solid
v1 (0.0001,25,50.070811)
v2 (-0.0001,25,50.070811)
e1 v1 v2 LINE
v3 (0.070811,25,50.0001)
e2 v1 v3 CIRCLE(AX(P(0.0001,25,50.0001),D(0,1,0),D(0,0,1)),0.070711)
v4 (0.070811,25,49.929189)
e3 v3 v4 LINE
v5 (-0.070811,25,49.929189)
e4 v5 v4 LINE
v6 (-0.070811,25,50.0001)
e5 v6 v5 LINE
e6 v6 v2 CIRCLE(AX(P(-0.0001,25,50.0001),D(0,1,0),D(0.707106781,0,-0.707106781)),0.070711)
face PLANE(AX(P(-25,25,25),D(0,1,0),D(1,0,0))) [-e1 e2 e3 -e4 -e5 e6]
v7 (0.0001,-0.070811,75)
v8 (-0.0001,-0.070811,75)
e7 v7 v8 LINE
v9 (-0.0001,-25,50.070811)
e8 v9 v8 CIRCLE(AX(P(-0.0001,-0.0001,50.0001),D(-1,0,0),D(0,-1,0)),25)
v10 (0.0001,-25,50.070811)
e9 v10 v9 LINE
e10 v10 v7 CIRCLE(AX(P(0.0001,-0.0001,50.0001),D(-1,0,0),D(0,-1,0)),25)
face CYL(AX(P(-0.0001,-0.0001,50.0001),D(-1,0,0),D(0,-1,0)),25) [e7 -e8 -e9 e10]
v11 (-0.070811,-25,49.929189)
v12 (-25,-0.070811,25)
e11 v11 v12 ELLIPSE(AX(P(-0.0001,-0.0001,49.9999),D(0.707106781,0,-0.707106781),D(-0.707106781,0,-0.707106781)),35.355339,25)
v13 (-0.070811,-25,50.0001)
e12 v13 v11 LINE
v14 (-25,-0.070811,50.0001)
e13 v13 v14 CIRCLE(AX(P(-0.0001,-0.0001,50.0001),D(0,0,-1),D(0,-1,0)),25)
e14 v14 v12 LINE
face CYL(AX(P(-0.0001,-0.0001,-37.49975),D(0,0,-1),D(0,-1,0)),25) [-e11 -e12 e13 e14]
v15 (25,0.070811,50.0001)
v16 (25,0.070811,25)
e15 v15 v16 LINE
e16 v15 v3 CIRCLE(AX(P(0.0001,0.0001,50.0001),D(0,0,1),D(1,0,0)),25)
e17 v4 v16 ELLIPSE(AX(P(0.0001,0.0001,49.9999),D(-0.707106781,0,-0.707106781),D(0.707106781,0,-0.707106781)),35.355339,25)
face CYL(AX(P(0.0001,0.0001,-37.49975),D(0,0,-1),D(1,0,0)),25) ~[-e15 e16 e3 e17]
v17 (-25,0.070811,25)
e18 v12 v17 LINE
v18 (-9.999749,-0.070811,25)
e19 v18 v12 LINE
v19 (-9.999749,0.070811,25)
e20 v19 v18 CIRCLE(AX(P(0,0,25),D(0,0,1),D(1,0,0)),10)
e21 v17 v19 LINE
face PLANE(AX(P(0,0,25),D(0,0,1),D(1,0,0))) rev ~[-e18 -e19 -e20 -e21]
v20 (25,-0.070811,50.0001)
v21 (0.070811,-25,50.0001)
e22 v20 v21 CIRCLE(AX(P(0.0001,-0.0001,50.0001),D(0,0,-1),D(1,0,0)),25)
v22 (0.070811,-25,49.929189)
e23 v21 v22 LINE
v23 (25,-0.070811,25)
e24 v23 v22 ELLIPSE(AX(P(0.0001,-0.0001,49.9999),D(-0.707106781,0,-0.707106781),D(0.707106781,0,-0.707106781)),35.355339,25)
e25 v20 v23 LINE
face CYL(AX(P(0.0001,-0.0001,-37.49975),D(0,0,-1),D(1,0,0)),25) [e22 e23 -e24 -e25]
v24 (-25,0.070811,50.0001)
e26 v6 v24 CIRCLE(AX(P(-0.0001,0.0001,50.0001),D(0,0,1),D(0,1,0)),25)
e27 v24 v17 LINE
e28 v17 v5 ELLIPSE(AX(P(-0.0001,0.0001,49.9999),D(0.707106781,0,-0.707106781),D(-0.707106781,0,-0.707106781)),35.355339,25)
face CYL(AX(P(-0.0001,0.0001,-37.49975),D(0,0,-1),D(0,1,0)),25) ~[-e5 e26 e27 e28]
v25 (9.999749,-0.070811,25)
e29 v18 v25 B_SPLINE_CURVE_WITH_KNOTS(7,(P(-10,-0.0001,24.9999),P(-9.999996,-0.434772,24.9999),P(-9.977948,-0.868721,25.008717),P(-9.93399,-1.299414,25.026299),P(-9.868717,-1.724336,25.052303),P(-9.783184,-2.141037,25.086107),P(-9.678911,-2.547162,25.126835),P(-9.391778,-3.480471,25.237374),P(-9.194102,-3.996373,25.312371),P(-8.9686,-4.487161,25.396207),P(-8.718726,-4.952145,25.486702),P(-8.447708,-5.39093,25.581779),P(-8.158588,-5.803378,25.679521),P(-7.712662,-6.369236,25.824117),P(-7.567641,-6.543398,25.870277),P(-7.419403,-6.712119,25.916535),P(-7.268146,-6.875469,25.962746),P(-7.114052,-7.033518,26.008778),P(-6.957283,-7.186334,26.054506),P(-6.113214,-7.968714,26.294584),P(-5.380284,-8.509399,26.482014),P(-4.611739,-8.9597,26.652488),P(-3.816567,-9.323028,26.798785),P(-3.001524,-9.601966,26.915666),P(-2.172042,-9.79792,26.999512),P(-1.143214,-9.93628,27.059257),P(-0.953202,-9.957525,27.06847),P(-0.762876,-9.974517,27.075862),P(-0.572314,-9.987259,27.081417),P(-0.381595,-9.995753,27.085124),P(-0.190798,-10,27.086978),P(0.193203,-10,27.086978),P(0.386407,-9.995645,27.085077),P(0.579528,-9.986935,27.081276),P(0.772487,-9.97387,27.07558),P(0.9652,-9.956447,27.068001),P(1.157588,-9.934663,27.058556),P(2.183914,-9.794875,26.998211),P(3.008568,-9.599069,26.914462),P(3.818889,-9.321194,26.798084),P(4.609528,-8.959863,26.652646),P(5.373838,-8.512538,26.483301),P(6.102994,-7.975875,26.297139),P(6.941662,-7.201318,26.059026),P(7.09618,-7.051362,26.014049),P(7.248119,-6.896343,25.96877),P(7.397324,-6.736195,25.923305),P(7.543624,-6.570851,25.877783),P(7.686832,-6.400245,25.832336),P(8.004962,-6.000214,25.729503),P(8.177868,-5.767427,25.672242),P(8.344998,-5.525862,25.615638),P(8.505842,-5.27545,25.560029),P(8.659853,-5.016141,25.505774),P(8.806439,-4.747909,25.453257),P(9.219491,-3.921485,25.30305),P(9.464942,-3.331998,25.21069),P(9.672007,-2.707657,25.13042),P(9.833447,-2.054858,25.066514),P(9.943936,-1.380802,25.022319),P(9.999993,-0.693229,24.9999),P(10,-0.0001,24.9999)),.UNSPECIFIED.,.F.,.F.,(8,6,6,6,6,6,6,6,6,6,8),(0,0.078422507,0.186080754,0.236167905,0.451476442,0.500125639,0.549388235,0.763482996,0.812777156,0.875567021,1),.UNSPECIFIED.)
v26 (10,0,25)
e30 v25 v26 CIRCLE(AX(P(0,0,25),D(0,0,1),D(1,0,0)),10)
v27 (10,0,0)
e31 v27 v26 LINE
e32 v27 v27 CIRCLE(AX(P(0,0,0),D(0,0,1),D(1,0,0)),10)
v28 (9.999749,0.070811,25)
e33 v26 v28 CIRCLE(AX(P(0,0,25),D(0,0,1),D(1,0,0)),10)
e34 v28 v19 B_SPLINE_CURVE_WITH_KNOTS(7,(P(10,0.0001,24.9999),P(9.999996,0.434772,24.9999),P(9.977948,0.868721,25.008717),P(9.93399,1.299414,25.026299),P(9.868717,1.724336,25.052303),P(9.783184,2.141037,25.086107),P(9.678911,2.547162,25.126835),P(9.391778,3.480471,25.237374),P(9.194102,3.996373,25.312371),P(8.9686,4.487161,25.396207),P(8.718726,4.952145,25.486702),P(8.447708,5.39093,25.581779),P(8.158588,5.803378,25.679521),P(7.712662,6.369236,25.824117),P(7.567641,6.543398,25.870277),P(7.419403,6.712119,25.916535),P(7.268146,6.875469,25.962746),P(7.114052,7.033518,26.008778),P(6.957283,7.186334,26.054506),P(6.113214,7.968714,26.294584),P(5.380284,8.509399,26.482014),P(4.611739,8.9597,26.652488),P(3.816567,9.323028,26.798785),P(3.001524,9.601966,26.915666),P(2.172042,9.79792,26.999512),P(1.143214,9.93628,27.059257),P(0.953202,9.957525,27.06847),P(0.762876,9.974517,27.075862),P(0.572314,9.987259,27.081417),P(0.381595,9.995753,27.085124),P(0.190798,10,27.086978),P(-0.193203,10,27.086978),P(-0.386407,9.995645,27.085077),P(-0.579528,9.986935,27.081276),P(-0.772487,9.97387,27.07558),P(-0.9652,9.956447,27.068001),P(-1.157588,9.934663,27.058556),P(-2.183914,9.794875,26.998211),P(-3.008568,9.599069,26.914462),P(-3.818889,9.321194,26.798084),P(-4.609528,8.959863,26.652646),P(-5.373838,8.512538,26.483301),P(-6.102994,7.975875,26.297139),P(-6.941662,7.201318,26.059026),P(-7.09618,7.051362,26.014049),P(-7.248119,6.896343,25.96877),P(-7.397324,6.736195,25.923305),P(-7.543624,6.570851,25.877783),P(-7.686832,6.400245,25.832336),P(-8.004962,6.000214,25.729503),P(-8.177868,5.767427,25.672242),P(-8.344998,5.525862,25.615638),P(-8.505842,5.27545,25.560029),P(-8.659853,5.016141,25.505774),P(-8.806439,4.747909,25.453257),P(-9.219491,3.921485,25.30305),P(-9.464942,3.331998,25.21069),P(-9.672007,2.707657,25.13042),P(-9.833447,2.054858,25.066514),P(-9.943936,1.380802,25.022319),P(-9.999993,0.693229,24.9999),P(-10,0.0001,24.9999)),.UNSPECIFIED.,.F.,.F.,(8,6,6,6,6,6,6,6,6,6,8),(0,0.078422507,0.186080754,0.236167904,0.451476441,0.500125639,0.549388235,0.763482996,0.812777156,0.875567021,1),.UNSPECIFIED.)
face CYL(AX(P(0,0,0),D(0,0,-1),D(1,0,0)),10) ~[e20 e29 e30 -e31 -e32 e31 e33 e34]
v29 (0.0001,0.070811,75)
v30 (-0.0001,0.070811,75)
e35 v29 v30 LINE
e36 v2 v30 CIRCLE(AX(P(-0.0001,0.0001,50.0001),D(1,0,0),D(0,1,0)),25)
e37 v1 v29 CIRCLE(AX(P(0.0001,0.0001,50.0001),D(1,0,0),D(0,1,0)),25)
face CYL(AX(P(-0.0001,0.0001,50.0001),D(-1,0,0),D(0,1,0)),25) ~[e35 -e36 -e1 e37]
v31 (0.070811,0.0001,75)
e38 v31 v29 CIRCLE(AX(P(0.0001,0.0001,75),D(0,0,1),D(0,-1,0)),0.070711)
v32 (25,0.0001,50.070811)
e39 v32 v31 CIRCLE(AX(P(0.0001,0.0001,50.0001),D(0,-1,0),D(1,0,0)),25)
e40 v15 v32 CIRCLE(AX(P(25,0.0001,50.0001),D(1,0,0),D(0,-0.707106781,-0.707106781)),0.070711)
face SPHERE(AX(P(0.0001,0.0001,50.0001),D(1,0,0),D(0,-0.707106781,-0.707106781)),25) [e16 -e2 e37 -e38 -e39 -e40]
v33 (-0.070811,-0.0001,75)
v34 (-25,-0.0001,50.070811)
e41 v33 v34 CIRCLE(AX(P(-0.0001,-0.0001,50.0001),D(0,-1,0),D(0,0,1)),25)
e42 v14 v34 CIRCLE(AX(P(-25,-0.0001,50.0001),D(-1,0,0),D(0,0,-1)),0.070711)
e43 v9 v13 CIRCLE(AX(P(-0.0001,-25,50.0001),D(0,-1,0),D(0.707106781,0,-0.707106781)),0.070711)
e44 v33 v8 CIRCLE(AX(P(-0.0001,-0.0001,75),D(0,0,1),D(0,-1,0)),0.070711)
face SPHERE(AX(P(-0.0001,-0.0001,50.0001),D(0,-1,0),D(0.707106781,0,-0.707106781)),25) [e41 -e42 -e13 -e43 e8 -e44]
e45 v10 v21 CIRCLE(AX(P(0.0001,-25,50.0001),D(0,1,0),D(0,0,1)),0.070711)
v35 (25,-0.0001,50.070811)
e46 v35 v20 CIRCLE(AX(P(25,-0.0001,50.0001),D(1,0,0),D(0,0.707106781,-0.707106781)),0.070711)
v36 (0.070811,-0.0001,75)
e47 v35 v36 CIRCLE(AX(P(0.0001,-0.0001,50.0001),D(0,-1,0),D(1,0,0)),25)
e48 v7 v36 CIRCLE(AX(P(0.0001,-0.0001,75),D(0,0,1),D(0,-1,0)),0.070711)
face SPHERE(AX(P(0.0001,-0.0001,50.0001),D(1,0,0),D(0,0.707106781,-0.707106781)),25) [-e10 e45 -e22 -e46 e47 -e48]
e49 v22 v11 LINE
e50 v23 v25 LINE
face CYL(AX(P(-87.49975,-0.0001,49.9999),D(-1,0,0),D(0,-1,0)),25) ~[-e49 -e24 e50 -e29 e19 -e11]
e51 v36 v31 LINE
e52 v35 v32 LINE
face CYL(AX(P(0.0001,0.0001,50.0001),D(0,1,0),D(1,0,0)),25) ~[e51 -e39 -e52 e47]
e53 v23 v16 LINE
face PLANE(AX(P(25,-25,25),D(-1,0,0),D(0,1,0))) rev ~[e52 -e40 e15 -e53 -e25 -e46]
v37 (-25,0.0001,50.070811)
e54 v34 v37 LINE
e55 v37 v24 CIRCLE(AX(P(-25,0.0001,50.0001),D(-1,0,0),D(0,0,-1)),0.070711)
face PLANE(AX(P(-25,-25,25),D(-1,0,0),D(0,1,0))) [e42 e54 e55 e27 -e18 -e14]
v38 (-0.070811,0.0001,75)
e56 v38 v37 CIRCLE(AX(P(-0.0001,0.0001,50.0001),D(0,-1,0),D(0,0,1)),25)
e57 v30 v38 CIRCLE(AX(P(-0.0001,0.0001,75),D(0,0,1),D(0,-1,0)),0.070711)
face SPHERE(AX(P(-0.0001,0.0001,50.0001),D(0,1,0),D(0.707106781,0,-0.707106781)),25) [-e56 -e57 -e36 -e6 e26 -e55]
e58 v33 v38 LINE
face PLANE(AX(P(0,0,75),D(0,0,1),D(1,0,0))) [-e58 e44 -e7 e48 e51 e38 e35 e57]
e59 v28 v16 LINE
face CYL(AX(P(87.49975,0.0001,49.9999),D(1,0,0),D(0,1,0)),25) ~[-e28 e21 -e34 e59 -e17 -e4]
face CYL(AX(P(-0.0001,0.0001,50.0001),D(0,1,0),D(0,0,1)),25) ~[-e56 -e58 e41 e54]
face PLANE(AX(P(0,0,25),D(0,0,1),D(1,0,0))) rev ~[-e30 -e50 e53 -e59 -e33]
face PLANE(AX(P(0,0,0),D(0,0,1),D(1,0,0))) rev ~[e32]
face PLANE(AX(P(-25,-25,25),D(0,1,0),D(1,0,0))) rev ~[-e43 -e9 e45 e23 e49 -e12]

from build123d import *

# Parameters (mm, degrees)
F0_R         = 10
F1_DEPTH     = 25
F2_W         = 50
F2_H         = 50
F3_DEPTH     = 50
F4_T1_DEPTH  = 87.4998500005
F4_T3_DEPTH  = 0.0002
F4_T5_DEPTH  = 0.0002
F4_S9_W      = 25.5
F4_S9_H      = 25.5
F4_T10_DEPTH = 25.5
F4_S15_W     = 25.5
F4_S15_H     = 25.5
F4_T16_DEPTH = 25.5
F4_S21_W     = 25.5
F4_S21_H     = 25.5
F4_T22_DEPTH = 25.5
F4_S27_W     = 25.5
F4_S27_H     = 25.5
F4_T28_DEPTH = 25.5
F4_T34_DEPTH = 174.999500001
F4_S35_R     = 10
F4_T36_DEPTH = 91
F4_T40_DEPTH = 174.999500001
F4_S41_R     = 10
F4_T42_DEPTH = 91


# Not quite as in the source:
# - a fillet or chamfer that OpenCascade refuses, or shapes differently, is made with other operations: its cross-section is extruded or revolved along the edge and cut away or added


with BuildPart() as f1:
    # F0 (on Top) → F1 (new body)
    with BuildSketch(Plane.XY):
        Circle(F0_R)
    extrude(amount=F1_DEPTH)

    # F2 (on face) → F3 (join)
    with BuildSketch(Plane.XY.offset(25)):
        Rectangle(F2_W, F2_H)
    extrude(amount=F3_DEPTH)

    # F4: fillet of radius 25 on 10 edges, made by hand

    # F4_s2 → F4_t1 (cut)
    with BuildSketch(Plane.XY.offset(-37.4997500005)):
        with BuildLine():
            ThreePointArc((-0.0001, -25.0001), (-17.6777695297, -17.6777695297), (-25.0001, -0.0001))
            Line((-25.0001, -0.0001), (-25.5001, -0.0001))
            ThreePointArc((-25.5001, -0.0001), (-25.5, -12.50005), (-25.5, -25))
            Line((-25.5, -25), (-25, -25.5))
            ThreePointArc((-25, -25.5), (-12.50005, -25.5), (-0.0001, -25.5001))
            Line((-0.0001, -25.5001), (-0.0001, -25.0001))
        make_face()
        with BuildLine():
            ThreePointArc((25.0001, -0.0001), (17.6777695297, -17.6777695297), (0.0001, -25.0001))
            Line((0.0001, -25.0001), (0.0001, -25.5001))
            ThreePointArc((0.0001, -25.5001), (12.50005, -25.5), (25, -25.5))
            Line((25, -25.5), (25.5, -25))
            ThreePointArc((25.5, -25), (25.5, -12.50005), (25.5001, -0.0001))
            Line((25.5001, -0.0001), (25.0001, -0.0001))
        make_face()
        with BuildLine():
            ThreePointArc((25.0001, 0.0001), (17.6777695297, 17.6777695297), (0.0001, 25.0001))
            Line((0.0001, 25.0001), (0.0001, 25.5001))
            ThreePointArc((0.0001, 25.5001), (12.50005, 25.5), (25, 25.5))
            Line((25, 25.5), (25.5, 25))
            ThreePointArc((25.5, 25), (25.5, 12.50005), (25.5001, 0.0001))
            Line((25.5001, 0.0001), (25.0001, 0.0001))
        make_face()
        with BuildLine():
            ThreePointArc((-0.0001, 25.0001), (-17.6777695297, 17.6777695297), (-25.0001, 0.0001))
            Line((-25.0001, 0.0001), (-25.5001, 0.0001))
            ThreePointArc((-25.5001, 0.0001), (-25.5, 12.50005), (-25.5, 25))
            Line((-25.5, 25), (-25, 25.5))
            ThreePointArc((-25, 25.5), (-12.50005, 25.5), (-0.0001, 25.5001))
            Line((-0.0001, 25.5001), (-0.0001, 25.0001))
        make_face()
    extrude(amount=F4_T1_DEPTH, mode=Mode.SUBTRACT)

    # F4_s4 → F4_t3 (cut)
    with BuildSketch(Plane.YZ.offset(-0.0001)):
        with BuildLine():
            ThreePointArc((-25.0001, 50.0001), (-17.6777695297, 67.6777695297), (-0.0001, 75.0001))
            Line((-0.0001, 75.0001), (-0.0001, 75.5001))
            ThreePointArc((-0.0001, 75.5001), (-12.50005, 75.5), (-25, 75.5))
            Line((-25, 75.5), (-25.5, 75))
            ThreePointArc((-25.5, 75), (-25.5, 62.50005), (-25.5001, 50.0001))
            Line((-25.5001, 50.0001), (-25.0001, 50.0001))
        make_face()
        with BuildLine():
            ThreePointArc((25.0001, 50.0001), (17.6777695297, 67.6777695297), (0.0001, 75.0001))
            Line((0.0001, 75.0001), (0.0001, 75.5001))
            ThreePointArc((0.0001, 75.5001), (12.50005, 75.5), (25, 75.5))
            Line((25, 75.5), (25.5, 75))
            ThreePointArc((25.5, 75), (25.5, 62.50005), (25.5001, 50.0001))
            Line((25.5001, 50.0001), (25.0001, 50.0001))
        make_face()
    extrude(amount=F4_T3_DEPTH, mode=Mode.SUBTRACT)

    # F4_s6 → F4_t5 (cut)
    with BuildSketch(Plane.XZ.offset(-0.0001)):
        with BuildLine():
            ThreePointArc((25.0001, 50.0001), (17.6777695297, 67.6777695297), (0.0001, 75.0001))
            Line((0.0001, 75.0001), (0.0001, 75.5001))
            ThreePointArc((0.0001, 75.5001), (12.50005, 75.5), (25, 75.5))
            Line((25, 75.5), (25.5, 75))
            ThreePointArc((25.5, 75), (25.5, 62.50005), (25.5001, 50.0001))
            Line((25.5001, 50.0001), (25.0001, 50.0001))
        make_face()
        with BuildLine():
            ThreePointArc((-0.0001, 75.0001), (-17.6777695297, 67.6777695297), (-25.0001, 50.0001))
            Line((-25.0001, 50.0001), (-25.5001, 50.0001))
            ThreePointArc((-25.5001, 50.0001), (-25.5, 62.50005), (-25.5, 75))
            Line((-25.5, 75), (-25, 75.5))
            ThreePointArc((-25, 75.5), (-12.50005, 75.5), (-0.0001, 75.5001))
            Line((-0.0001, 75.5001), (-0.0001, 75.0001))
        make_face()
    extrude(amount=F4_T5_DEPTH, mode=Mode.SUBTRACT)


with BuildPart() as f4_tool8:
    # F4_s9 → F4_t10 (new body)
    with BuildSketch(Plane.XZ.offset(0.0001)):
        with Locations((-12.7501, 62.7501)):
            Rectangle(F4_S9_W, F4_S9_H)
    extrude(amount=F4_T10_DEPTH)

    # F4_s11 → F4_t12 (revolve, cut)
    with BuildSketch(Plane(origin=(-0.0001, -0.0001, 50.0001), x_dir=(0.7071067812, 0, -0.7071067812), z_dir=(-0.7071067812, 0, -0.7071067812))):
        with BuildLine():
            ThreePointArc((0, -25), (25, 0), (0, 25))
            Line((0, 25), (0, -25))
        make_face()
    revolve(axis=Axis((-0.0001, -0.0001, 50.0001), (0, -1, 0)), mode=Mode.SUBTRACT)


with BuildPart() as f1_1:
    add(f1.part)

    # F4_t7: cut F4_tool8
    add(f4_tool8.part, mode=Mode.SUBTRACT)


with BuildPart() as f4_tool14:
    # F4_s15 → F4_t16 (new body)
    with BuildSketch(Plane.YZ.offset(0.0001)):
        with Locations((-12.7501, 62.7501)):
            Rectangle(F4_S15_W, F4_S15_H)
    extrude(amount=F4_T16_DEPTH)

    # F4_s17 → F4_t18 (revolve, cut)
    with BuildSketch(Plane(origin=(0.0001, -0.0001, 50.0001), x_dir=(0, 0.7071067812, -0.7071067812), z_dir=(0, -0.7071067812, -0.7071067812))):
        with BuildLine():
            ThreePointArc((0, -25), (25, 0), (0, 25))
            Line((0, 25), (0, -25))
        make_face()
    revolve(axis=Axis((0.0001, -0.0001, 50.0001), (1, 0, 0)), mode=Mode.SUBTRACT)


with BuildPart() as f1_2:
    add(f1_1.part)

    # F4_t13: cut F4_tool14
    add(f4_tool14.part, mode=Mode.SUBTRACT)


with BuildPart() as f4_tool20:
    # F4_s21 → F4_t22 (new body)
    with BuildSketch(Plane.YZ.offset(0.0001)):
        with Locations((12.7501, 62.7501)):
            Rectangle(F4_S21_W, F4_S21_H)
    extrude(amount=F4_T22_DEPTH)

    # F4_s23 → F4_t24 (revolve, cut)
    with BuildSketch(Plane(origin=(0.0001, 0.0001, 50.0001), x_dir=(0, -0.7071067812, -0.7071067812), z_dir=(0, -0.7071067812, 0.7071067812))):
        with BuildLine():
            ThreePointArc((0, -25), (25, 0), (0, 25))
            Line((0, 25), (0, -25))
        make_face()
    revolve(axis=Axis((0.0001, 0.0001, 50.0001), (1, 0, 0)), mode=Mode.SUBTRACT)


with BuildPart() as f1_3:
    add(f1_2.part)

    # F4_t19: cut F4_tool20
    add(f4_tool20.part, mode=Mode.SUBTRACT)


with BuildPart() as f4_tool26:
    # F4_s27 → F4_t28 (new body)
    with BuildSketch(Plane.XZ.offset(-0.0001)):
        with Locations((-12.7501, 62.7501)):
            Rectangle(F4_S27_W, F4_S27_H)
    extrude(amount=-F4_T28_DEPTH)

    # F4_s29 → F4_t30 (revolve, cut)
    with BuildSketch(Plane(origin=(-0.0001, 0.0001, 50.0001), x_dir=(0.7071067812, 0, -0.7071067812), z_dir=(0.7071067812, 0, 0.7071067812))):
        with BuildLine():
            ThreePointArc((0, -25), (25, 0), (0, 25))
            Line((0, 25), (0, -25))
        make_face()
    revolve(axis=Axis((-0.0001, 0.0001, 50.0001), (0, 1, 0)), mode=Mode.SUBTRACT)


with BuildPart() as f1_4:
    add(f1_3.part)

    # F4_t25: cut F4_tool26
    add(f4_tool26.part, mode=Mode.SUBTRACT)


with BuildPart() as f4_tool32:
    # F4_s33 → F4_t34 (new body)
    with BuildSketch(Plane.YZ.offset(-87.4997500005)):
        with BuildLine():
            ThreePointArc((-25.0001, 49.9999), (-17.6777695297, 32.3222304703), (-0.0001, 24.9999))
            Line((-0.0001, 24.9999), (-0.0001, 24.4999))
            ThreePointArc((-0.0001, 24.4999), (-12.50005, 24.5), (-25, 24.5))
            Line((-25, 24.5), (-25.5, 25))
            ThreePointArc((-25.5, 25), (-25.5, 37.49995), (-25.5001, 49.9999))
            Line((-25.5001, 49.9999), (-25.0001, 49.9999))
        make_face()
    extrude(amount=F4_T34_DEPTH)

    # F4_s35 → F4_t36 (cut, symmetric)
    with BuildSketch(Plane.XY.offset(37.2)):
        Circle(F4_S35_R)
    extrude(amount=F4_T36_DEPTH, both=True, mode=Mode.SUBTRACT)


with BuildPart() as f1_5:
    add(f1_4.part)

    # F4_t31: cut F4_tool32
    add(f4_tool32.part, mode=Mode.SUBTRACT)


with BuildPart() as f4_tool38:
    # F4_s39 → F4_t40 (new body)
    with BuildSketch(Plane.YZ.offset(87.4997500005)):
        with BuildLine():
            ThreePointArc((25.0001, 49.9999), (17.6777695297, 32.3222304703), (0.0001, 24.9999))
            Line((0.0001, 24.9999), (0.0001, 24.4999))
            ThreePointArc((0.0001, 24.4999), (12.50005, 24.5), (25, 24.5))
            Line((25, 24.5), (25.5, 25))
            ThreePointArc((25.5, 25), (25.5, 37.49995), (25.5001, 49.9999))
            Line((25.5001, 49.9999), (25.0001, 49.9999))
        make_face()
    extrude(amount=-F4_T40_DEPTH)

    # F4_s41 → F4_t42 (cut, symmetric)
    with BuildSketch(Plane.XY.offset(37.2)):
        Circle(F4_S41_R)
    extrude(amount=F4_T42_DEPTH, both=True, mode=Mode.SUBTRACT)


with BuildPart() as f1_6:
    add(f1_5.part)

    # F4_t37: cut F4_tool38
    add(f4_tool38.part, mode=Mode.SUBTRACT)


solid = f1_6.part
